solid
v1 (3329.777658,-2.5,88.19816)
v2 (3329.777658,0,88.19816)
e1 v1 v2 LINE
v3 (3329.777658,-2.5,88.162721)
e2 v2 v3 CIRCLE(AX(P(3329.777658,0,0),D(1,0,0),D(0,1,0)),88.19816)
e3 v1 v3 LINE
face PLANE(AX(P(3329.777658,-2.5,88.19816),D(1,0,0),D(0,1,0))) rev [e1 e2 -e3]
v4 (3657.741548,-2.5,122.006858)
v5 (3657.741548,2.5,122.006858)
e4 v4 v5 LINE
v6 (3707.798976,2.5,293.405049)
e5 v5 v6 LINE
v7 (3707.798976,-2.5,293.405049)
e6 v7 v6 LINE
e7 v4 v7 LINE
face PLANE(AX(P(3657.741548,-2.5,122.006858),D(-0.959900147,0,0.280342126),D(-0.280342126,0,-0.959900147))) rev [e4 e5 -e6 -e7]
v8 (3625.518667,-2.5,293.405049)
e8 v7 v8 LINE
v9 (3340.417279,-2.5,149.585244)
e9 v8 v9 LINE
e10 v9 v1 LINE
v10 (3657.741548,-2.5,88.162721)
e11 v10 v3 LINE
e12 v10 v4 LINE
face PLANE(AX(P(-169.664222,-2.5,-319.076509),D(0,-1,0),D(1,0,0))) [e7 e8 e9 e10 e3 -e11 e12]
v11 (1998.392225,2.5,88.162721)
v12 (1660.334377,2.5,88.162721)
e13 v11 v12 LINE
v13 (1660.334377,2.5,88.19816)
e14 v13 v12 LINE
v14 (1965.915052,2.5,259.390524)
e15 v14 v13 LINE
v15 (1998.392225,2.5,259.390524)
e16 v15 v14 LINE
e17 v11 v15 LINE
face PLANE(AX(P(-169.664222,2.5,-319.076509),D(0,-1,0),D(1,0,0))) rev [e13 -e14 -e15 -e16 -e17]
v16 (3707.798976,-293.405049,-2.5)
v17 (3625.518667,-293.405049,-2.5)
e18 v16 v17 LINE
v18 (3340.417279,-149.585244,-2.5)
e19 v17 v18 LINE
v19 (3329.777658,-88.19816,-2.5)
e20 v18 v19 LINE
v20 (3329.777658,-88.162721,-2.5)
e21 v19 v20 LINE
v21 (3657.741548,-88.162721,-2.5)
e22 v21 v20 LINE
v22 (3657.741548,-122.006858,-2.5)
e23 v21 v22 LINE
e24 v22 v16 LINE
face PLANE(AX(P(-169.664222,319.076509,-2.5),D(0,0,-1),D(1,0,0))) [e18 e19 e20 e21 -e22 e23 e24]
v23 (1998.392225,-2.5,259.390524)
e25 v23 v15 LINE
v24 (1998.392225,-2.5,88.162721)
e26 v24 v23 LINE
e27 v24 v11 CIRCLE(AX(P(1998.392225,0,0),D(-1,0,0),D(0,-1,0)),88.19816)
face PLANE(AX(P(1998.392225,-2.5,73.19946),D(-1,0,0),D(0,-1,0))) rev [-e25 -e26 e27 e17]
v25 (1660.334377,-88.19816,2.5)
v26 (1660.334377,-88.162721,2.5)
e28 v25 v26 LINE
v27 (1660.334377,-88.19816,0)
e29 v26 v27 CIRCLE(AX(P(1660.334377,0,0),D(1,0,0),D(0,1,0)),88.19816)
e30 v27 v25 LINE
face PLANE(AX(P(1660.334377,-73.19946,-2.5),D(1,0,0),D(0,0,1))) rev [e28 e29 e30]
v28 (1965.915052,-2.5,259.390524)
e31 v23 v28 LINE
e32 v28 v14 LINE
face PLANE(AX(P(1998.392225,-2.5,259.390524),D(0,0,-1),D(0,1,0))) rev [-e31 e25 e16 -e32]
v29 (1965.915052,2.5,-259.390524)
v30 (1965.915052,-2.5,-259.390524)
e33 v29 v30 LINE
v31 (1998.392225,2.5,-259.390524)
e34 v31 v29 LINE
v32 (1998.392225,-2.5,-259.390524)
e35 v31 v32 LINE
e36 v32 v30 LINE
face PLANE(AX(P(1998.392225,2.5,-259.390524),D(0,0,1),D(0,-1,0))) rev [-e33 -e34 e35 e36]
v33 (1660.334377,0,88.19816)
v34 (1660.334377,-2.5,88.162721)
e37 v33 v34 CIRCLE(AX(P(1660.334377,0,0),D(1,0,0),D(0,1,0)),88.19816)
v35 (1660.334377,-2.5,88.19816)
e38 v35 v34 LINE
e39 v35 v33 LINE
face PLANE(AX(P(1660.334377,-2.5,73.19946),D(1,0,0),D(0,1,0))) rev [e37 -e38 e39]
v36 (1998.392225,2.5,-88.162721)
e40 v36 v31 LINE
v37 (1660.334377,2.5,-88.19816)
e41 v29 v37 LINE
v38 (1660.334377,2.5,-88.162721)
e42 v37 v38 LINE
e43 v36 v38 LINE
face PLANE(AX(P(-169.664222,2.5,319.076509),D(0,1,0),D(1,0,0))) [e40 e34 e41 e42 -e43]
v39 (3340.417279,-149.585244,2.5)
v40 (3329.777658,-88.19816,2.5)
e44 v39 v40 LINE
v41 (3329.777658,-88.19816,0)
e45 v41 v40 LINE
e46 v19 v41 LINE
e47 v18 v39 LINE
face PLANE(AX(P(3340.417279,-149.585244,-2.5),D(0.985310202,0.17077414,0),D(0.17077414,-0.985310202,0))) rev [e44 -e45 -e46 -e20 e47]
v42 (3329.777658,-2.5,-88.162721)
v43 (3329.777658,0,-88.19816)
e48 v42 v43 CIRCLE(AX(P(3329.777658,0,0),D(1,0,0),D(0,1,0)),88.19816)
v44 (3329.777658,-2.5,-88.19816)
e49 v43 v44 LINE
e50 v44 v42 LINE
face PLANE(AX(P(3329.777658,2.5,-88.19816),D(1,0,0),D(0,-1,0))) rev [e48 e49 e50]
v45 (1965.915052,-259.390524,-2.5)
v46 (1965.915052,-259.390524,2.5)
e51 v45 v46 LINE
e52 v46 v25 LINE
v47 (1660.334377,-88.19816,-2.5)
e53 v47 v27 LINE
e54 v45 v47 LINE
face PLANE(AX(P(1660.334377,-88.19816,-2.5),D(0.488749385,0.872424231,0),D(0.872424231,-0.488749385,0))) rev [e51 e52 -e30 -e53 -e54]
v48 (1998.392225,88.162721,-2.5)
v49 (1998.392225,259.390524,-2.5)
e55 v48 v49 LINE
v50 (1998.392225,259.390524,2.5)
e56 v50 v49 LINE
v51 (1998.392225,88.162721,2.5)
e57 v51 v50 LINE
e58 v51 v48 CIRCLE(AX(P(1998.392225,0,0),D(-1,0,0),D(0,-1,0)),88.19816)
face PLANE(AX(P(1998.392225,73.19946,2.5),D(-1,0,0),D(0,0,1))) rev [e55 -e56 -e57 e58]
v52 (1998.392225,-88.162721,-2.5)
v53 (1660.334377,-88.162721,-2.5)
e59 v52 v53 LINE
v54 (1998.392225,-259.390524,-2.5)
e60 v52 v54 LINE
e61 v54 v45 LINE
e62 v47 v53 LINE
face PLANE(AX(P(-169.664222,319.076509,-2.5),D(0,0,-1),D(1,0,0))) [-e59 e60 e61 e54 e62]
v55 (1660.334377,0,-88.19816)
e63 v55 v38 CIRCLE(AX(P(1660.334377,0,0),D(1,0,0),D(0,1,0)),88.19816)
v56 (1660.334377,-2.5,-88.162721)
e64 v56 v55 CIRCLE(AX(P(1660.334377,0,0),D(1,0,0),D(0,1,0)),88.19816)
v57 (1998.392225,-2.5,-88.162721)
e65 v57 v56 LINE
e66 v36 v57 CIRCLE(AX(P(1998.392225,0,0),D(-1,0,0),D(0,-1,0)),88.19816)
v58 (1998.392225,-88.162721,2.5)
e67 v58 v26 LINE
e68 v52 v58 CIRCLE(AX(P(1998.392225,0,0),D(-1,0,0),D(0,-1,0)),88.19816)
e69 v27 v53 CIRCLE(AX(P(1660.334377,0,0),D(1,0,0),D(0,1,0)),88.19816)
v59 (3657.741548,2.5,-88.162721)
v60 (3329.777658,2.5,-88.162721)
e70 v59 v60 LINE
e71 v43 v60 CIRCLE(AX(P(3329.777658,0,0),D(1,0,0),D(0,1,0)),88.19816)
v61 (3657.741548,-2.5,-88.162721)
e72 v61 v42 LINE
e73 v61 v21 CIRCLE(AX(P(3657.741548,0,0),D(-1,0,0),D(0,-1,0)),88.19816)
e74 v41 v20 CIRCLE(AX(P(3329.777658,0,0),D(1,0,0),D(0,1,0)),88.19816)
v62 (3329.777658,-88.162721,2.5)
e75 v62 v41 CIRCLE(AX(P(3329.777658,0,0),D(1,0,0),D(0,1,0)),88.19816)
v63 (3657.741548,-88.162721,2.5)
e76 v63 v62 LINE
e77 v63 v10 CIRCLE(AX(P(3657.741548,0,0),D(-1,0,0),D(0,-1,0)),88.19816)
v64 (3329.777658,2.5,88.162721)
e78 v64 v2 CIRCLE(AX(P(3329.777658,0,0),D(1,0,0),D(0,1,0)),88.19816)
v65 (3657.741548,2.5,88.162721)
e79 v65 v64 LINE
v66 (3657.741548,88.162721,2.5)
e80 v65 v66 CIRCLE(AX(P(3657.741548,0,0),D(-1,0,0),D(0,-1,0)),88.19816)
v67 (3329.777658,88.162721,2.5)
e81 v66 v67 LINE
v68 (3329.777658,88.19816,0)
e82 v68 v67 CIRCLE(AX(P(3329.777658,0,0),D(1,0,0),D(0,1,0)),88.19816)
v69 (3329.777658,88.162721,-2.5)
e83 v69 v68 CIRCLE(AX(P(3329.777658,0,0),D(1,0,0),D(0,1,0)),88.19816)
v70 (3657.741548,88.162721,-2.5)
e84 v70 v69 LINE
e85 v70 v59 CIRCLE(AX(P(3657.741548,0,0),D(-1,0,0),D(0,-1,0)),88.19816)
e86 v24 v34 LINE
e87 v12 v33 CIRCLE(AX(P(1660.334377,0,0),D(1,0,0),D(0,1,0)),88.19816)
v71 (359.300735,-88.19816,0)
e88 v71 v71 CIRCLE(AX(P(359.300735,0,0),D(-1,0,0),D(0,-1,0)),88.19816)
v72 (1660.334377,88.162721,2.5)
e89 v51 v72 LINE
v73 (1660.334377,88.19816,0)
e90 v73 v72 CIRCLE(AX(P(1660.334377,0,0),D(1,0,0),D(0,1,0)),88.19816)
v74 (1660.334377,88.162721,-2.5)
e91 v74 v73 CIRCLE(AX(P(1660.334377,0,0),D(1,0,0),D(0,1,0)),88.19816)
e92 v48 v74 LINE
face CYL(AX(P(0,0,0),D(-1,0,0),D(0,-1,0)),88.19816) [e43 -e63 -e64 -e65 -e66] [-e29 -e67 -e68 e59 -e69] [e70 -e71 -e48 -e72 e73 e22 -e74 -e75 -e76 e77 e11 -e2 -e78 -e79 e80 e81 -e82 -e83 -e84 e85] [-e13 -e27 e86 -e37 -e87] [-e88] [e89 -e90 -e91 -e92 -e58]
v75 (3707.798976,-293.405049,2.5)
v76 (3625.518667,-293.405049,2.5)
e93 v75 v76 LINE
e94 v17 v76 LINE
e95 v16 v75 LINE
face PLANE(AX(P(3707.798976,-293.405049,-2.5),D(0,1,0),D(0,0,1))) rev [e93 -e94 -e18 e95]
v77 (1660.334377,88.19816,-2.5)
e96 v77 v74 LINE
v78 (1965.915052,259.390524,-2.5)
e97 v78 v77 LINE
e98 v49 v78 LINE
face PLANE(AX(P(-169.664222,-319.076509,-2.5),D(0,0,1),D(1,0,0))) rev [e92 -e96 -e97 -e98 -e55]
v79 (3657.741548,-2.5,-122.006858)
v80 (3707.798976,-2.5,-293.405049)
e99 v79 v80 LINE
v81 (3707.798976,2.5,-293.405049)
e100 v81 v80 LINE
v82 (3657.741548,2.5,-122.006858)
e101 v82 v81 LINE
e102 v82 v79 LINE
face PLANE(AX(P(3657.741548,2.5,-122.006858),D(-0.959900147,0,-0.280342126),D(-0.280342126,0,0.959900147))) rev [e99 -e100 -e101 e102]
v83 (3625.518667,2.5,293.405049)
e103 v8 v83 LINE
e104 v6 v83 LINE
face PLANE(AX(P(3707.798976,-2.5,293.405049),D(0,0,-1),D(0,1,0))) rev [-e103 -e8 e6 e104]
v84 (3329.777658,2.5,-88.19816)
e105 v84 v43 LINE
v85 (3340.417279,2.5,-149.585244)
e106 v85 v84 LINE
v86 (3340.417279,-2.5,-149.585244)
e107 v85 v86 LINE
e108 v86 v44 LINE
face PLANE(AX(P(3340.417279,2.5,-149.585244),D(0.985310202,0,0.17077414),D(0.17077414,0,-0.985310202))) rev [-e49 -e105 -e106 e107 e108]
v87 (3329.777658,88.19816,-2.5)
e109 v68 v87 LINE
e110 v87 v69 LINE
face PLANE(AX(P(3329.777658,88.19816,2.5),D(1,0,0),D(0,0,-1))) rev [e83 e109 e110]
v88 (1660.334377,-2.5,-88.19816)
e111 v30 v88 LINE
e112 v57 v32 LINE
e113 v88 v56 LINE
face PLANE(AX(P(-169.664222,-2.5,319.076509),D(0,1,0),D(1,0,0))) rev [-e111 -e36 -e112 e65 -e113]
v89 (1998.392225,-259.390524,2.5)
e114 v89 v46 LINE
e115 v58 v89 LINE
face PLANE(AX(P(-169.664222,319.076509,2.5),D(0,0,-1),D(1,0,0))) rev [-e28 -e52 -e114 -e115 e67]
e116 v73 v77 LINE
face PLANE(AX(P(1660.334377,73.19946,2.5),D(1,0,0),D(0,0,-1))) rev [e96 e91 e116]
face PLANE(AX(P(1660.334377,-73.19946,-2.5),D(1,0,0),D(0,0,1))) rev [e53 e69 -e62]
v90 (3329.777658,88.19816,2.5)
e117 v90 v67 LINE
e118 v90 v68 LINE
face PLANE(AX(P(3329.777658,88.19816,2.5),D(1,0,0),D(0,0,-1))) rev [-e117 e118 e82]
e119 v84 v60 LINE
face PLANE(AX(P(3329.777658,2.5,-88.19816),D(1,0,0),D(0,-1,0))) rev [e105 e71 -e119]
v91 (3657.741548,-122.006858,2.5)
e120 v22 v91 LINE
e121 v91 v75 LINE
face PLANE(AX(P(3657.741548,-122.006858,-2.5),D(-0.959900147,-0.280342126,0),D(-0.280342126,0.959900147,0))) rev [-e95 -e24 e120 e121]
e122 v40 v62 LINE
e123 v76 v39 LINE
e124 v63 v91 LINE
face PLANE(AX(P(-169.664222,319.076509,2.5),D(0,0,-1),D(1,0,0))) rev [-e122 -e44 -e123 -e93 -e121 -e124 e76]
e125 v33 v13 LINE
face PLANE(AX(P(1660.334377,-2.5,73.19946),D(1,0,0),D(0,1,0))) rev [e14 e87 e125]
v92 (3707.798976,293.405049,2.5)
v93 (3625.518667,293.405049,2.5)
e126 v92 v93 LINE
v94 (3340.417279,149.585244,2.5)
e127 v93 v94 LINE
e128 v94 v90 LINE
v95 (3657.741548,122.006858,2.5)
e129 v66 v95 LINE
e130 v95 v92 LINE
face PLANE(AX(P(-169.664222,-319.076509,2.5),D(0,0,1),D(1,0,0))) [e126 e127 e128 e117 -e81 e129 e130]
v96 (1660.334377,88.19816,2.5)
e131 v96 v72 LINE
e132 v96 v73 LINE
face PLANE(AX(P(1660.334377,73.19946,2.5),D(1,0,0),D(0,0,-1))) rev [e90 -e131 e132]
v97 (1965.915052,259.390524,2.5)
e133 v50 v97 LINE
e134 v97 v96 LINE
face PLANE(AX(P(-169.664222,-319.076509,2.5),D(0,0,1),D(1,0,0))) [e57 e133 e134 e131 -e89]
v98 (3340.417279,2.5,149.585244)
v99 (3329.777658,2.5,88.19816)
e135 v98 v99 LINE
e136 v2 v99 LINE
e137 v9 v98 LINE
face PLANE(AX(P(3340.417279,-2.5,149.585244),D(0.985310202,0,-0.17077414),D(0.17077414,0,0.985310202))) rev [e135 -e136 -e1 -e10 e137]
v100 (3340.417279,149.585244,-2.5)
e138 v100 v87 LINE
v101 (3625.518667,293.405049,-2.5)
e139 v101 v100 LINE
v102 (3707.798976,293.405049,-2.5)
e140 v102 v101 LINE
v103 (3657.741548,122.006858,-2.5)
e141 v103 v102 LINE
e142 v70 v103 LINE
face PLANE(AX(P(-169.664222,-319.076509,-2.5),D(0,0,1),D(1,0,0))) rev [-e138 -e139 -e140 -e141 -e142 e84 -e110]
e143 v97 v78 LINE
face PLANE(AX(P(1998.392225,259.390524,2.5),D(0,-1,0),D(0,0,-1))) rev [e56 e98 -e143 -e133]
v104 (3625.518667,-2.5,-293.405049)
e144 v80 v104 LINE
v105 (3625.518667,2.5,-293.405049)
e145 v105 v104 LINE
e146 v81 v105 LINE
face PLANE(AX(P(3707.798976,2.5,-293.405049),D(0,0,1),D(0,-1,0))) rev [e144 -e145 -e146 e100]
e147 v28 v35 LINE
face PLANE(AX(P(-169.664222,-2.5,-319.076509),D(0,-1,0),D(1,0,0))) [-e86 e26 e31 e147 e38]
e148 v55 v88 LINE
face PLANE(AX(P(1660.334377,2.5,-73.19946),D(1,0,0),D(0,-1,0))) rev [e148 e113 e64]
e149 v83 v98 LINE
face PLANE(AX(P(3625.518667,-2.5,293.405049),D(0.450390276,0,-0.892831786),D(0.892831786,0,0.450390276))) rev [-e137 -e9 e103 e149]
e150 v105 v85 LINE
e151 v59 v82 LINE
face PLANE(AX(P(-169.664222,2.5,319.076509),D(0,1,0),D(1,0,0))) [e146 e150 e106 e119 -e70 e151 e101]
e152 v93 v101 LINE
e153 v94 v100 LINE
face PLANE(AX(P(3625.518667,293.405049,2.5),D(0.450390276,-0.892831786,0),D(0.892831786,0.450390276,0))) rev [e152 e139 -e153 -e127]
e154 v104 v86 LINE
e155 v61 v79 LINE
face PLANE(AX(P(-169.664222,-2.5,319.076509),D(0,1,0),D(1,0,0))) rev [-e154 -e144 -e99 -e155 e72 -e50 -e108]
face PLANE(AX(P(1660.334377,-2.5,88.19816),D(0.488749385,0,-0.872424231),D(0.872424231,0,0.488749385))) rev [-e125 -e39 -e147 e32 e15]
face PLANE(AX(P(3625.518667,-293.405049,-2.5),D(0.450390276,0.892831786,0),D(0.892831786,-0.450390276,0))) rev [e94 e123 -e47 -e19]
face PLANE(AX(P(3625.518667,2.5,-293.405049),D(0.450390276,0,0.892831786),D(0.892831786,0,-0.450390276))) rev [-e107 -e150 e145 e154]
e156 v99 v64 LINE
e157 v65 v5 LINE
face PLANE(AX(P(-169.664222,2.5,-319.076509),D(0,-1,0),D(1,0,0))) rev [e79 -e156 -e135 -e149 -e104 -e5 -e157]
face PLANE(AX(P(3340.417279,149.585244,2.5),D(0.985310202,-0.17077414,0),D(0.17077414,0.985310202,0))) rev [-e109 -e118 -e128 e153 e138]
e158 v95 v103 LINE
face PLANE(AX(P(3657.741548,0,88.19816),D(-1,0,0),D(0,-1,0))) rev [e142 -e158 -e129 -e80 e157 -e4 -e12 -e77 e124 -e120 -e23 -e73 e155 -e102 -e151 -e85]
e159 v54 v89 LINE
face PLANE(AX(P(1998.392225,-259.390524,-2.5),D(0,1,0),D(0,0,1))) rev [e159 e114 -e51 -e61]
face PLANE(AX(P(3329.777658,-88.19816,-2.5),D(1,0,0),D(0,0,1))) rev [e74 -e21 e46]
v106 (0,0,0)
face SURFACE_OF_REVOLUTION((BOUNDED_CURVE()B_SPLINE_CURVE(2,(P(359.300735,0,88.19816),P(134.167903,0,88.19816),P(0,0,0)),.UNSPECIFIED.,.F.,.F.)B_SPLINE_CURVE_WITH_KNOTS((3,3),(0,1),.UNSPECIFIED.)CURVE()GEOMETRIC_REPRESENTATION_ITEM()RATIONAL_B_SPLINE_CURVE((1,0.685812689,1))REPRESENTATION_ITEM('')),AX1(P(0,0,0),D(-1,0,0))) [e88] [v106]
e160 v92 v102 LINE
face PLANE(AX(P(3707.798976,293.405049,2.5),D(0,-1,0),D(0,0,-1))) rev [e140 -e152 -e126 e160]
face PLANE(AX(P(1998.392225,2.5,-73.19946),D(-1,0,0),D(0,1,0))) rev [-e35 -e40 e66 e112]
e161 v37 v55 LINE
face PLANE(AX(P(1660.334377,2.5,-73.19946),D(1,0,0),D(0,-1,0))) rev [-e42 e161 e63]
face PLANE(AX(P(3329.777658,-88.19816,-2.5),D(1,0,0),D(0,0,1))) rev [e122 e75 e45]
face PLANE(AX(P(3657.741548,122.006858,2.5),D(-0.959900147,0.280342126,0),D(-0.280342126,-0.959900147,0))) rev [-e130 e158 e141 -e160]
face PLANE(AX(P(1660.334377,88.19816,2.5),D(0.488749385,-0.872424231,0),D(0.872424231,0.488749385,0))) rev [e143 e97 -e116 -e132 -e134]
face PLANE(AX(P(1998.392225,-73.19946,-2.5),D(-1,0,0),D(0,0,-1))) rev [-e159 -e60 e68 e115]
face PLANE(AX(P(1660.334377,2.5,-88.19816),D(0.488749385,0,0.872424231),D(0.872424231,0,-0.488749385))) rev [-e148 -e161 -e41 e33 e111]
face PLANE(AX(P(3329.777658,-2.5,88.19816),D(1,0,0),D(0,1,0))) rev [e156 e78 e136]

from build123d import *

# Parameters (mm, degrees)
BOSS_EXTRUDE1_DEPTH   = 0.529212532
BOSS_EXTRUDE1_2_DEPTH = 0.529212532
CIRPATTERN1_COUNT     = 4
SCALE1_SCALE          = 4.724
BODY_MOVE_COPY1_ANGLE = 90


with BuildPart() as part:
    # Sketch1 → Revolve1 (revolve)
    with BuildSketch(Plane.XY, mode=Mode.PRIVATE) as revolve1_sk:
        with BuildLine():
            Line((111.973953624, 86.213943438), (810.204439049, 86.213943438))
            Line((810.204439049, 86.213943438), (810.204439049, 67.543714902))
            Line((810.204439049, 67.543714902), (35.915373063, 67.543714902))
            add(Edge.make_bspline(
                [(35.915373063, 67.543714902), (64.316707395, 86.213943438), (111.973953624, 86.213943438)],
                knots=[0, 0, 0, 1, 1, 1], degree=2, weights=[1, 0.685812689, 1]))
        make_face()
    revolve(revolve1_sk.sketch.rotate(Axis((35.915373063, 67.543714902, 0), (1, 0, 0)), 90), axis=Axis((35.915373063, 67.543714902, 0), (1, 0, 0)))


with BuildPart() as body_2:
    # Sketch2 → Boss-Extrude1 (new, symmetric)
    with BuildSketch(Plane.XY):
        Polygon((387.383276717, 83.038943438), (458.945056672, 83.038943438), (458.945056672, 122.452801344), (452.070125847, 122.452801344), (387.383276717, 86.213943438), align=None)
    extrude(amount=BOSS_EXTRUDE1_DEPTH, both=True)


with BuildPart() as body_3:
    # Sketch2 → Boss-Extrude1 2 (new, symmetric)
    with BuildSketch(Plane.XY):
        Polygon((740.77939896, 86.213943438), (740.77939896, 83.038943438), (810.204439049, 83.038943438), (810.204439049, 86.213943438), (810.204439049, 93.370738151), (820.800846483, 129.653166351), (803.38333804, 129.653166351), (743.031647149, 99.208669237), align=None)
    extrude(amount=BOSS_EXTRUDE1_2_DEPTH, both=True)


with BuildPart() as cirpattern1_1:
    # CirPattern1: pattern copy
    add(body_3.part.rotate(Axis((0, 67.543714902, 0), (1, 0, 0)), 1 * 360 / CIRPATTERN1_COUNT))


with BuildPart() as cirpattern1_2:
    # CirPattern1: pattern copy
    add(body_3.part.rotate(Axis((0, 67.543714902, 0), (1, 0, 0)), 2 * 360 / CIRPATTERN1_COUNT))


with BuildPart() as cirpattern1_3:
    # CirPattern1: pattern copy
    add(body_3.part.rotate(Axis((0, 67.543714902, 0), (1, 0, 0)), 3 * 360 / CIRPATTERN1_COUNT))


with BuildPart() as cirpattern1_4:
    # CirPattern1: pattern copy
    add(body_2.part.rotate(Axis((0, 67.543714902, 0), (1, 0, 0)), 1 * 360 / CIRPATTERN1_COUNT))


with BuildPart() as cirpattern1_5:
    # CirPattern1: pattern copy
    add(body_2.part.rotate(Axis((0, 67.543714902, 0), (1, 0, 0)), 2 * 360 / CIRPATTERN1_COUNT))


with BuildPart() as cirpattern1_6:
    # CirPattern1: pattern copy
    add(body_2.part.rotate(Axis((0, 67.543714902, 0), (1, 0, 0)), 3 * 360 / CIRPATTERN1_COUNT))


with BuildPart() as part_1:
    add(part.part)

    # Combine1: union CirPattern1_4, body 2, CirPattern1_6, CirPattern1_5, body 3, CirPattern1_1, CirPattern1_3, CirPattern1_2
    add(cirpattern1_4.part)
    add(body_2.part)
    add(cirpattern1_6.part)
    add(cirpattern1_5.part)
    add(body_3.part)
    add(cirpattern1_1.part)
    add(cirpattern1_3.part)
    add(cirpattern1_2.part)


with BuildPart() as part_2:
    # Scale1: scaled about (0, 0, 0)
    add(part_1.part.scale(SCALE1_SCALE))


with BuildPart() as part_3:
    # Body-Move/Copy1: read off the stored shape, not the designer's step
    # Body-Move/Copy1: moved
    add(part_2.part.moved(Location((-169.6642223, -319.0765092, 0))).rotate(Axis((0, 0, 0), (1, 0, 0)), BODY_MOVE_COPY1_ANGLE))


solid = part_3.part
